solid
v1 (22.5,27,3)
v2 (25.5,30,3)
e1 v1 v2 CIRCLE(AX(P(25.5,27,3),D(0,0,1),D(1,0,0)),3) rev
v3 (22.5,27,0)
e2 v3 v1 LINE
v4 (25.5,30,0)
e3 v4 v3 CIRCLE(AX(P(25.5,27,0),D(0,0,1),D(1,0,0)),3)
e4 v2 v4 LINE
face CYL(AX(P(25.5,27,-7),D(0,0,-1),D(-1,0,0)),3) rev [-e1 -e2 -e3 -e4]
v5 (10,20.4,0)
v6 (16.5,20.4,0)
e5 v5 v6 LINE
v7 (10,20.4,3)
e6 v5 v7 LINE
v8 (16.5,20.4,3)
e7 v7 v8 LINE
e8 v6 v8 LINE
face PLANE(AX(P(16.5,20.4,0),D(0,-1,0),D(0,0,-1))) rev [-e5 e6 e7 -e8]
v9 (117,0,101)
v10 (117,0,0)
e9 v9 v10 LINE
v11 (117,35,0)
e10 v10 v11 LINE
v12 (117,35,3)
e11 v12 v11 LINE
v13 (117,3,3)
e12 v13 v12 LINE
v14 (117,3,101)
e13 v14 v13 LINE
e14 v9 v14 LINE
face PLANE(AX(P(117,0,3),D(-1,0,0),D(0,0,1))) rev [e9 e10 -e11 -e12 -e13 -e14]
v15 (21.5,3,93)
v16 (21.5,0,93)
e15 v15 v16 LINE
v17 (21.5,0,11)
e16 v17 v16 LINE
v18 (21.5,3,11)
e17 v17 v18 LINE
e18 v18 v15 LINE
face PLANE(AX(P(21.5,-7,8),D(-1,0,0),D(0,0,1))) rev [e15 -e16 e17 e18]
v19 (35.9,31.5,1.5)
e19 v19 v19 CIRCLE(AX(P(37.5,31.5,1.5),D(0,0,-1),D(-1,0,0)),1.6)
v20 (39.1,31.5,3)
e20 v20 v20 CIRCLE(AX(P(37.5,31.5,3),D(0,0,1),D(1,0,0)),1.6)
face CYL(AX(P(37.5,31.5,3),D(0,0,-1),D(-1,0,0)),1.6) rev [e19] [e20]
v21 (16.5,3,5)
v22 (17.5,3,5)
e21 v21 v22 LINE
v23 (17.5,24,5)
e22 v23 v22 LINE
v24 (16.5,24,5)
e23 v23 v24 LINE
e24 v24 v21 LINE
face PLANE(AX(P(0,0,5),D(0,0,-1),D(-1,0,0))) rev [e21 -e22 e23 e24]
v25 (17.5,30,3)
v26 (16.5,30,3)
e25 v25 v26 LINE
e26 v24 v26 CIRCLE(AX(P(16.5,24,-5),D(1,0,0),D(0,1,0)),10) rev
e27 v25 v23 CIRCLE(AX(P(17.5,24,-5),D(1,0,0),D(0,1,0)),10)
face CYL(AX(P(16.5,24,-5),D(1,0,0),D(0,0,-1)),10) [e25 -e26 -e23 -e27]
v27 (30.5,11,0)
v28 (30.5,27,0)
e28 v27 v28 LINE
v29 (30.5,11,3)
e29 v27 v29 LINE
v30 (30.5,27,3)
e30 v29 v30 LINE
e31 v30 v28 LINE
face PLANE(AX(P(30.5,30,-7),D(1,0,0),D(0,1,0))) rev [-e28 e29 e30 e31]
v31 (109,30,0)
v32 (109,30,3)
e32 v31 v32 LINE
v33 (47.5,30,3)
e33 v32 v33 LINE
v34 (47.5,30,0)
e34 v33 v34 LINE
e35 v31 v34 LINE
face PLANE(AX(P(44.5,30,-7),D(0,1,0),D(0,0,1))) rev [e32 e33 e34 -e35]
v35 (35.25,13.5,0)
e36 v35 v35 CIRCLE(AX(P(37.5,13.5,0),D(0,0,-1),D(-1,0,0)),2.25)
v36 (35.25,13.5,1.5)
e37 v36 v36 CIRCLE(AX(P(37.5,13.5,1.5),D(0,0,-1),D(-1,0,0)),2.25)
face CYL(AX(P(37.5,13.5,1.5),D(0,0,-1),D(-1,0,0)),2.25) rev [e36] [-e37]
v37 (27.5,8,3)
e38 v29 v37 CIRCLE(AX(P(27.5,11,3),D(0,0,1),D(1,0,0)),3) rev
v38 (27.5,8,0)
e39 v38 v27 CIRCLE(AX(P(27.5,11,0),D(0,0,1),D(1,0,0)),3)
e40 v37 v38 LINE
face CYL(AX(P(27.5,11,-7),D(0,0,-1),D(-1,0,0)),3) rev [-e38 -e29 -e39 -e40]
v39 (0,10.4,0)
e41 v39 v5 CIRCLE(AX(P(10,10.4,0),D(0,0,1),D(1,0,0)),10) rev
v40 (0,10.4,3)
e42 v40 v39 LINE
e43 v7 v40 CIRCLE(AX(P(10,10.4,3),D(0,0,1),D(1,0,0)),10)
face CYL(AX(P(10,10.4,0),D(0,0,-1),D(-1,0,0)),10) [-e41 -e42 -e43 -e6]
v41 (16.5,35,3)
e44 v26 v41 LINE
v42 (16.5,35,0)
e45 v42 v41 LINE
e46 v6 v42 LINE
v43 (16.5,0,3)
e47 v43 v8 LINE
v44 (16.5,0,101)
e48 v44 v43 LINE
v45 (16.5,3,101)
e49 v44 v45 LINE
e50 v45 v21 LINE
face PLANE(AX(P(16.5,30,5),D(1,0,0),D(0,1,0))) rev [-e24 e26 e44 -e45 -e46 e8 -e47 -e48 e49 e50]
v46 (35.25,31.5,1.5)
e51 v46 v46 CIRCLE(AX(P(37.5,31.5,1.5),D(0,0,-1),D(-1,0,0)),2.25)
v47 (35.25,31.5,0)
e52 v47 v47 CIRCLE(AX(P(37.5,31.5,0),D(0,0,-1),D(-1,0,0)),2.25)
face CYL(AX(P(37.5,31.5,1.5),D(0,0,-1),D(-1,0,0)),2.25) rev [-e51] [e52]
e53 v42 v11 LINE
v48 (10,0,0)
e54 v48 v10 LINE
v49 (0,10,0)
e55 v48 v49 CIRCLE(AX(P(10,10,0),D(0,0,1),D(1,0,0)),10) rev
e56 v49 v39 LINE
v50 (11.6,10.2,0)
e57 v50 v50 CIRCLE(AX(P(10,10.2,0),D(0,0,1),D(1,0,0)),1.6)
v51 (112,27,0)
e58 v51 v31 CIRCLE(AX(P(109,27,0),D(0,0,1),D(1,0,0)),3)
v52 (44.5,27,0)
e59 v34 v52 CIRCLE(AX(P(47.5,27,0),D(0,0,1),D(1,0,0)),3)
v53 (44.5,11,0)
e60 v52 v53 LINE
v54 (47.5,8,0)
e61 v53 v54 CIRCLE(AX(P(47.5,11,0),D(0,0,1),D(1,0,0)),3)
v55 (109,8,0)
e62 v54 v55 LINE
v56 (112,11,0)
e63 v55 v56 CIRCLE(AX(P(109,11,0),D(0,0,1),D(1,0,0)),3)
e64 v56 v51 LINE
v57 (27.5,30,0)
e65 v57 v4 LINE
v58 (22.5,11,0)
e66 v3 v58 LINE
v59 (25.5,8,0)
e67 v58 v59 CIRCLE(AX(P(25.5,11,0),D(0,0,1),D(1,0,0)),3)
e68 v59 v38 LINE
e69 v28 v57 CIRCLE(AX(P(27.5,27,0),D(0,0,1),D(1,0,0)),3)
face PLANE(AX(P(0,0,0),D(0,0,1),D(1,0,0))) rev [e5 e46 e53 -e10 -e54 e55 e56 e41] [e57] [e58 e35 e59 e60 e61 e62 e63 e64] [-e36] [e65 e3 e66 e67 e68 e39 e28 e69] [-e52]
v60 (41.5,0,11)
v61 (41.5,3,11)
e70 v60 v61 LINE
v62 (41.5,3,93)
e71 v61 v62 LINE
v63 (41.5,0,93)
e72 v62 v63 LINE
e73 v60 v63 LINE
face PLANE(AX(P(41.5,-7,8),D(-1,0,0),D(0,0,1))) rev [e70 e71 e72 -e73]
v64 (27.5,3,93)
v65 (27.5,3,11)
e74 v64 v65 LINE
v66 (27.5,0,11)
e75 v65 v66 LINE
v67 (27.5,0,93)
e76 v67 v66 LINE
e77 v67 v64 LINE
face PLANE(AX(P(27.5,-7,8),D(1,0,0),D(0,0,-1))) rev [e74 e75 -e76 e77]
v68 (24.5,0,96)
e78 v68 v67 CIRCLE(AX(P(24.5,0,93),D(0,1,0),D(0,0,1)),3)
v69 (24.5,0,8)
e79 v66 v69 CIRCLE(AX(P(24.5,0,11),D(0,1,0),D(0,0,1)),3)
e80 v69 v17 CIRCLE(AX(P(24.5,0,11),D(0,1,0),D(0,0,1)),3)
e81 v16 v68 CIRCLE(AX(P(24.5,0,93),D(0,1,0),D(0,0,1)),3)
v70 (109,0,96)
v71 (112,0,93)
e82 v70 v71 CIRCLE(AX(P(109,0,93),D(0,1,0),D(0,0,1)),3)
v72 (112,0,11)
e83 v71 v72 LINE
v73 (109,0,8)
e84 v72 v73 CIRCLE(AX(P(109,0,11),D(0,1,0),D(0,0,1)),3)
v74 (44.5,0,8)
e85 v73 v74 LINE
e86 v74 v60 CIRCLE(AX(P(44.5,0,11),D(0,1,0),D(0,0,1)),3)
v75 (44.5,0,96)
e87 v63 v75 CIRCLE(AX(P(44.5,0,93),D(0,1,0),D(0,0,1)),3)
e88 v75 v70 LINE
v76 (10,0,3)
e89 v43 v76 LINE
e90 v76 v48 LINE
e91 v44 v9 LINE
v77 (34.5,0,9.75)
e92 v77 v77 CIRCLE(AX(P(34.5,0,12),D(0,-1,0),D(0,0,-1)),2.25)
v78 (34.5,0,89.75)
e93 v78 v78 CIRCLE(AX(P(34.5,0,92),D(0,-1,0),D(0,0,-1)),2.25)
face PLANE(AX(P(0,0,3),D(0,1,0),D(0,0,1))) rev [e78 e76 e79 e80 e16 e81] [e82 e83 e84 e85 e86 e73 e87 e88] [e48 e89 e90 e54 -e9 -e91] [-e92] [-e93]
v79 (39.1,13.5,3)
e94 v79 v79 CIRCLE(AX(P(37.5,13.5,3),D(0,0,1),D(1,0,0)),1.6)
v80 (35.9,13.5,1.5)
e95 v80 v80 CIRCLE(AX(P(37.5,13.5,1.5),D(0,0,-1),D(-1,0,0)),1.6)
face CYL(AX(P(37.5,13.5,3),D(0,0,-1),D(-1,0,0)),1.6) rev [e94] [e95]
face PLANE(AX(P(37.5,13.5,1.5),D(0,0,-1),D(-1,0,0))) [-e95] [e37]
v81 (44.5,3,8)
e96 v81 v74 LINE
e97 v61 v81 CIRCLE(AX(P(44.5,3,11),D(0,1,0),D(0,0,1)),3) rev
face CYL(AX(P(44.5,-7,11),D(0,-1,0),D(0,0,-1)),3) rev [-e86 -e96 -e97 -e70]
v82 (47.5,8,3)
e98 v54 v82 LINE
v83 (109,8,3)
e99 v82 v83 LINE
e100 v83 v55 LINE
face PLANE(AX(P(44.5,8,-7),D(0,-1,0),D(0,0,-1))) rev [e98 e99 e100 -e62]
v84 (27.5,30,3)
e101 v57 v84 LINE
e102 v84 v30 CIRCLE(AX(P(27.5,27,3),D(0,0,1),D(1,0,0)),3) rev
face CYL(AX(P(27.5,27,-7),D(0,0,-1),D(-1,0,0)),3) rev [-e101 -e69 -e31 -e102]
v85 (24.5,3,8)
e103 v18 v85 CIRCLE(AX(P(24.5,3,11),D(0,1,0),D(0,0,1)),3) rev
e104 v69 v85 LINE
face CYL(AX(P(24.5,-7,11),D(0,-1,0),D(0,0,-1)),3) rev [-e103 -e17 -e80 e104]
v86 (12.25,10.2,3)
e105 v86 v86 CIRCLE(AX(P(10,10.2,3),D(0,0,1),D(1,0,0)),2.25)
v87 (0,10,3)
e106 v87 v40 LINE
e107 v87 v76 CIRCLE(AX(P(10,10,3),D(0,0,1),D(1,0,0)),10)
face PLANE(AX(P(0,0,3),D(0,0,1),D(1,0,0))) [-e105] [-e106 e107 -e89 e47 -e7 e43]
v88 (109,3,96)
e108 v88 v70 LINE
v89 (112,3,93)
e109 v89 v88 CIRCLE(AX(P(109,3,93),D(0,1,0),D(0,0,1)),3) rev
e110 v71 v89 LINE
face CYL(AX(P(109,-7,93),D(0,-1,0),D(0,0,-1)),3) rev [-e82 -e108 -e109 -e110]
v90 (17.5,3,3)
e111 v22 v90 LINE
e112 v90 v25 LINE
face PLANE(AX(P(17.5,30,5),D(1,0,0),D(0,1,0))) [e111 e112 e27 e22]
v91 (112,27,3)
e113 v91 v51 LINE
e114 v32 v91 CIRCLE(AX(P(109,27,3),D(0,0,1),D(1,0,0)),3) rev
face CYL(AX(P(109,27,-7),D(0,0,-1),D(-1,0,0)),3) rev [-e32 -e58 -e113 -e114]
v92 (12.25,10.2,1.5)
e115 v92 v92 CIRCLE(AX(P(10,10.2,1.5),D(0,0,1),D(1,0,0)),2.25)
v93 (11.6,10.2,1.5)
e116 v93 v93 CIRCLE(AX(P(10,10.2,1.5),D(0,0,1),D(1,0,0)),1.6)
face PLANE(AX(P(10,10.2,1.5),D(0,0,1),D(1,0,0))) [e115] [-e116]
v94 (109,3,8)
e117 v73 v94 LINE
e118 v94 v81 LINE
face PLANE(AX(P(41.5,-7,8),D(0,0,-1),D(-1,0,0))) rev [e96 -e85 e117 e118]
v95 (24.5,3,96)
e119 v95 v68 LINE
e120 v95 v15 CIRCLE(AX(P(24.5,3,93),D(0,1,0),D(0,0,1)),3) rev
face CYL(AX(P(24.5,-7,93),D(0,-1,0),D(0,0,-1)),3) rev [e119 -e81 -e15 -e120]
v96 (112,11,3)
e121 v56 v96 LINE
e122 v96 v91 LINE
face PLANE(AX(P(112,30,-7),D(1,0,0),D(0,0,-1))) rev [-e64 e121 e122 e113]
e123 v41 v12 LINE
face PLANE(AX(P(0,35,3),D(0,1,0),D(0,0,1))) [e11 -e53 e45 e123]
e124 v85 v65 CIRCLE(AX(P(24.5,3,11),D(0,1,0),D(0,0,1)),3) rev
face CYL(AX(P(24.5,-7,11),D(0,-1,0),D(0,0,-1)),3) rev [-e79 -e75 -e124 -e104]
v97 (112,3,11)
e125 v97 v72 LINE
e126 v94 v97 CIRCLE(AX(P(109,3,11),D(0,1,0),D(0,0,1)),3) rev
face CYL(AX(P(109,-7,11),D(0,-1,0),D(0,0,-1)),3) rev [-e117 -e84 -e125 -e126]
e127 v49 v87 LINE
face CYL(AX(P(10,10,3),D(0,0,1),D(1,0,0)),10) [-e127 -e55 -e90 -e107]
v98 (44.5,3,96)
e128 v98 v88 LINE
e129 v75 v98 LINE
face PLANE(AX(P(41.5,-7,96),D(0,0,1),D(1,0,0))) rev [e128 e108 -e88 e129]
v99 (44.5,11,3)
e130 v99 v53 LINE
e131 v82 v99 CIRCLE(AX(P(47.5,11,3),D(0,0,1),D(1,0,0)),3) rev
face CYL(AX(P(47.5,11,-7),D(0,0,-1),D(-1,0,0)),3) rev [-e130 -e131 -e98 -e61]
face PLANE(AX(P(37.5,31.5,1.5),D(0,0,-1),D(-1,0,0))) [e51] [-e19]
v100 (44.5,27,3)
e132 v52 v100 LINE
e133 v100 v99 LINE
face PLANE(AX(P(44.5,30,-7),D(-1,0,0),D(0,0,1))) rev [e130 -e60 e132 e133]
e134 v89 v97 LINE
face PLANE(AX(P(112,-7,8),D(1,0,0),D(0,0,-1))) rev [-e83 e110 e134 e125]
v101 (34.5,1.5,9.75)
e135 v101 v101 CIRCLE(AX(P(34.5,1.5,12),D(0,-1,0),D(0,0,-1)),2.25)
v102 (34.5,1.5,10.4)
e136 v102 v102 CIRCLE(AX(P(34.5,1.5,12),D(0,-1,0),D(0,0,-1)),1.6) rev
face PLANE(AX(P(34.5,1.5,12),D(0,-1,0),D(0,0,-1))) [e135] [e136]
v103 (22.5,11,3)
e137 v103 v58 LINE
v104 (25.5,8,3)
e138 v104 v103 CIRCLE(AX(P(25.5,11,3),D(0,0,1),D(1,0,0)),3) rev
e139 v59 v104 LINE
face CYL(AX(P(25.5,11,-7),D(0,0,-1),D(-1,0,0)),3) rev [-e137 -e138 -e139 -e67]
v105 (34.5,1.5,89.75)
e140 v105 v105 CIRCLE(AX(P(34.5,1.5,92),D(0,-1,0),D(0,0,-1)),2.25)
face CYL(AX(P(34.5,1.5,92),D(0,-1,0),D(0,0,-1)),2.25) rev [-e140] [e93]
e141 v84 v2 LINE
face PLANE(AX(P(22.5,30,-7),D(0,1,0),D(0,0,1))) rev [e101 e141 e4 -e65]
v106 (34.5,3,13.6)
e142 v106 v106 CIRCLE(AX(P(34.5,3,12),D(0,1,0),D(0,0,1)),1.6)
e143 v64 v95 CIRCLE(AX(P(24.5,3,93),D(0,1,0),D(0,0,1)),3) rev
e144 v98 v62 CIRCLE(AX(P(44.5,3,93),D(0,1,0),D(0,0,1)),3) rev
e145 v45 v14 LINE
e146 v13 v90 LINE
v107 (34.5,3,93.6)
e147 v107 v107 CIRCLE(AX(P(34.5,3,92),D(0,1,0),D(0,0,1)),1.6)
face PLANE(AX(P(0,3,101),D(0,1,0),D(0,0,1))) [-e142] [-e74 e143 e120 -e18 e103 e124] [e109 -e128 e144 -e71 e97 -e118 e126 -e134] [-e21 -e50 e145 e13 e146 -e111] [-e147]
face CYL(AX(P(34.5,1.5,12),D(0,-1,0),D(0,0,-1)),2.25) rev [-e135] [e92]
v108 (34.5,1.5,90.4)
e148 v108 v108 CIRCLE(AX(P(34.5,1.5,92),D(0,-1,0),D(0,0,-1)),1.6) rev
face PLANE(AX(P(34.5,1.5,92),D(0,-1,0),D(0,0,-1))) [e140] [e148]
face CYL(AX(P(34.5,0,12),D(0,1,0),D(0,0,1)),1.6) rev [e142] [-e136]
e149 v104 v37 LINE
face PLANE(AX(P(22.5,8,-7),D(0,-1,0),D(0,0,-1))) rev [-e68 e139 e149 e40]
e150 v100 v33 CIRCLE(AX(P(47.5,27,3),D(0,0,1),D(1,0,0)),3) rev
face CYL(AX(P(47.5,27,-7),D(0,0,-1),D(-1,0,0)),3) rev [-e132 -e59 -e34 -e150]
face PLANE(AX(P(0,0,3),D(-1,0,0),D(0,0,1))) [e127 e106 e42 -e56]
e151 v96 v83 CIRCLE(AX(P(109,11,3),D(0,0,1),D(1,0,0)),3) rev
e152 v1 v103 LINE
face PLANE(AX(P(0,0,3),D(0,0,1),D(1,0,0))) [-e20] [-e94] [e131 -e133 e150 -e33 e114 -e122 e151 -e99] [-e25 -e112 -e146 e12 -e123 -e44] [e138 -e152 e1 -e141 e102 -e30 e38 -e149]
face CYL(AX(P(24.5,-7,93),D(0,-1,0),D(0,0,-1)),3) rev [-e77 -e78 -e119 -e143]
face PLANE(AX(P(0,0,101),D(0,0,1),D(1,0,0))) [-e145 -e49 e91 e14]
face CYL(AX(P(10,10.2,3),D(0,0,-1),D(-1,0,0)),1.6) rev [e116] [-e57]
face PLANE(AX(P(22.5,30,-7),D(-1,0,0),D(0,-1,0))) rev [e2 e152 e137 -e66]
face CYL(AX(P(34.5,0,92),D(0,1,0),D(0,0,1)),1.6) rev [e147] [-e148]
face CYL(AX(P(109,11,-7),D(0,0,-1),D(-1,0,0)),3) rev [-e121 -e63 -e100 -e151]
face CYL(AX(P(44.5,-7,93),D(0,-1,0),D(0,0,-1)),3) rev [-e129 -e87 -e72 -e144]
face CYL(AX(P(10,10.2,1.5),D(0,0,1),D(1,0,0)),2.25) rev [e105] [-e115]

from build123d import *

# Parameters (mm, degrees)
SKETCH1_R           = 1.6
SKETCH1_W           = 1
SKETCH1_H           = 27
BOSS_EXTRUDE1_DEPTH = 3
SKETCH1_3_W         = 1
SKETCH1_3_H         = 27
BOSS_EXTRUDE2_DEPTH = 5
BOSS_EXTRUDE3_DEPTH = 101
SKETCH2_R           = 2.25
CUT_EXTRUDE1_DEPTH  = 1.5
SKETCH4_R           = 2.25
CUT_EXTRUDE2_DEPTH  = 1.5
SKETCH5_R           = 1.6
CUT_EXTRUDE3_DEPTH  = 3
SKETCH6_R           = 2.25
CUT_EXTRUDE4_DEPTH  = 1.5
SKETCH7_W           = 16.5
SKETCH7_H           = 98
CUT_EXTRUDE5_DEPTH  = 3
SKETCH8_W           = 16.5
SKETCH8_H           = 14.6
CUT_EXTRUDE6_DEPTH  = 3
FILLET1_R           = 10
FILLET2_R           = 10
FILLET3_R           = 10
SKETCH9_W           = 67.5
SKETCH9_H           = 22
SKETCH9_W_2         = 8
CUT_EXTRUDE7_DEPTH  = 10
FILLET4_R           = 3
SKETCH10_W          = 70.5
SKETCH10_H          = 88
SKETCH10_W_2        = 6
CUT_EXTRUDE8_DEPTH  = 10
FILLET5_R           = 3


# Some blends are built 0.0001 mm under size
with BuildPart() as part:
    # Sketch1 → Boss-Extrude1 (new body)
    # profile 1 of 3: a face of its own
    with BuildSketch(Plane.XY):
        Polygon((0, 3), (0, 0), (117, 0), (117, 3), (17.5, 3), (16.5, 3), align=None)
    # profile 2 of 3: a face of its own
    with BuildSketch(Plane.XY):
        Polygon((0, 35), (0, 3), (16.5, 3), (16.5, 30), (17.5, 30), (17.5, 3), (117, 3), (117, 35), align=None)
        with Locations((10, 10.2)):
            Circle(SKETCH1_R, mode=Mode.SUBTRACT)
        with Locations((37.5, 13.5)):
            Circle(SKETCH1_R, mode=Mode.SUBTRACT)
        with Locations((37.5, 31.5)):
            Circle(SKETCH1_R, mode=Mode.SUBTRACT)
    # profile 3 of 3: a face of its own
    with BuildSketch(Plane.XY):
        with Locations((17, 16.5)):
            Rectangle(SKETCH1_W, SKETCH1_H)
    extrude(amount=BOSS_EXTRUDE1_DEPTH)

    # Sketch1<3> → Boss-Extrude2 (add)
    with BuildSketch(Plane.XY):
        with Locations((17, 16.5)):
            Rectangle(SKETCH1_3_W, SKETCH1_3_H)
    extrude(amount=BOSS_EXTRUDE2_DEPTH)

    # Sketch1<7> → Boss-Extrude3 (add)
    with BuildSketch(Plane.XY):
        Polygon((0, 3), (0, 0), (117, 0), (117, 3), (17.5, 3), (16.5, 3), align=None)
    extrude(amount=BOSS_EXTRUDE3_DEPTH)

    # Sketch2 → Cut-Extrude1 (cut)
    with BuildSketch(Plane(origin=(0, 0, 0), x_dir=(-1, 0, 0), z_dir=(0, 0, -1))):
        with Locations((-37.5, 31.5)):
            Circle(SKETCH2_R)
        with Locations((-37.5, 13.5)):
            Circle(SKETCH2_R)
    extrude(amount=-CUT_EXTRUDE1_DEPTH, mode=Mode.SUBTRACT)

    # Sketch4 → Cut-Extrude2 (cut)
    with BuildSketch(Plane.XY.offset(3)):
        with Locations((10, 10.2)):
            Circle(SKETCH4_R)
    extrude(amount=-CUT_EXTRUDE2_DEPTH, mode=Mode.SUBTRACT)

    # Sketch5 → Cut-Extrude3 (cut)
    with BuildSketch(Plane(origin=(0, 3, 0), x_dir=(1, 0, 0), z_dir=(0, 1, 0))):
        with Locations(Location((34.5, -12, 0), (0, 0, 270))):
            Circle(SKETCH5_R)
        with Locations(Location((34.5, -92, 0), (0, 0, 270))):
            Circle(SKETCH5_R)
    extrude(amount=-CUT_EXTRUDE3_DEPTH, mode=Mode.SUBTRACT)

    # Sketch6 → Cut-Extrude4 (cut)
    with BuildSketch(Plane.XZ):
        with Locations(Location((34.5, 92, 0), (0, 0, 270))):
            Circle(SKETCH6_R)
        with Locations(Location((34.5, 12, 0), (0, 0, 270))):
            Circle(SKETCH6_R)
    extrude(amount=-CUT_EXTRUDE4_DEPTH, mode=Mode.SUBTRACT)

    # Sketch7 → Cut-Extrude5 (cut)
    with BuildSketch(Plane(origin=(0, 3, 0), x_dir=(1, 0, 0), z_dir=(0, 1, 0))):
        with Locations((8.25, -52)):
            Rectangle(SKETCH7_W, SKETCH7_H)
    extrude(amount=-CUT_EXTRUDE5_DEPTH, mode=Mode.SUBTRACT)

    # Sketch8 → Cut-Extrude6 (cut)
    with BuildSketch(Plane.XY.offset(3)):
        with Locations((8.25, 27.7)):
            Rectangle(SKETCH8_W, SKETCH8_H)
    extrude(amount=-CUT_EXTRUDE6_DEPTH, mode=Mode.SUBTRACT)

    # Fillet1
    fillet1_edges = [part.edges().sort_by_distance(p)[0] for p in [
        (0, 20.4, 1.5),
    ]]
    fillet(fillet1_edges, radius=FILLET1_R)

    # Fillet2
    fillet2_edges = [part.edges().sort_by_distance(p)[0] for p in [
        (0, 0, 1.5),
    ]]
    fillet(fillet2_edges, radius=FILLET2_R)

    # Fillet3
    # the kernel refuses this fillet: 10 mm, written as the material it takes off along each edge
    with BuildSketch(Plane(origin=(1.5, 30, 5), x_dir=(0, 0, -1), z_dir=(1, 0, 0))) as fillet3_piece_1:
        with BuildLine():
            CenterArc((10, -6), FILLET3_R, 143.130102354, 36.869897646)
            Line((0, -6), (-0.2, -6))
            Line((-0.2, -6), (-0.2, 0))
            Line((-0.2, 0), (0, 0.2))
            ThreePointArc((0, 0.2), (1, 0.2), (1.84, 0.12))
            Line((1.84, 0.12), (2, 0))
        make_face()
    extrude(amount=31, mode=Mode.SUBTRACT)

    # Sketch9 → Cut-Extrude7 (cut)
    with BuildSketch(Plane.XY.offset(3)):
        with Locations((78.25, 19)):
            Rectangle(SKETCH9_W, SKETCH9_H)
        with Locations((26.5, 19)):
            Rectangle(SKETCH9_W_2, SKETCH9_H)
    extrude(amount=-CUT_EXTRUDE7_DEPTH, mode=Mode.SUBTRACT)

    # Fillet4
    fillet4_edges = [part.edges().sort_by_distance(p)[0] for p in [
        (44.5, 8, 1.5),
        (44.5, 30, 1.5),
        (112, 30, 1.5),
        (112, 8, 1.5),
        (22.5, 8, 1.5),
        (22.5, 30, 1.5),
        (30.5, 30, 1.5),
        (30.5, 8, 1.5),
    ]]
    fillet(fillet4_edges, radius=FILLET4_R)

    # Sketch10 → Cut-Extrude8 (cut)
    with BuildSketch(Plane(origin=(0, 3, 0), x_dir=(1, 0, 0), z_dir=(0, 1, 0))):
        with Locations((76.75, -52)):
            Rectangle(SKETCH10_W, SKETCH10_H)
        with Locations((24.5, -52)):
            Rectangle(SKETCH10_W_2, SKETCH10_H)
    extrude(amount=-CUT_EXTRUDE8_DEPTH, mode=Mode.SUBTRACT)

    # Fillet5
    fillet5_edges = [part.edges().sort_by_distance(p)[0] for p in [
        (41.5, 1.5, 96),
        (41.5, 1.5, 8),
        (112, 1.5, 8),
        (112, 1.5, 96),
        (21.5, 1.5, 96),
        (21.5, 1.5, 8),
        (27.5, 1.5, 8),
        (27.5, 1.5, 96),
    ]]
    fillet(fillet5_edges, radius=FILLET5_R - 0.0001)  # a hair under: the kernel refuses the full size


solid = part.part
